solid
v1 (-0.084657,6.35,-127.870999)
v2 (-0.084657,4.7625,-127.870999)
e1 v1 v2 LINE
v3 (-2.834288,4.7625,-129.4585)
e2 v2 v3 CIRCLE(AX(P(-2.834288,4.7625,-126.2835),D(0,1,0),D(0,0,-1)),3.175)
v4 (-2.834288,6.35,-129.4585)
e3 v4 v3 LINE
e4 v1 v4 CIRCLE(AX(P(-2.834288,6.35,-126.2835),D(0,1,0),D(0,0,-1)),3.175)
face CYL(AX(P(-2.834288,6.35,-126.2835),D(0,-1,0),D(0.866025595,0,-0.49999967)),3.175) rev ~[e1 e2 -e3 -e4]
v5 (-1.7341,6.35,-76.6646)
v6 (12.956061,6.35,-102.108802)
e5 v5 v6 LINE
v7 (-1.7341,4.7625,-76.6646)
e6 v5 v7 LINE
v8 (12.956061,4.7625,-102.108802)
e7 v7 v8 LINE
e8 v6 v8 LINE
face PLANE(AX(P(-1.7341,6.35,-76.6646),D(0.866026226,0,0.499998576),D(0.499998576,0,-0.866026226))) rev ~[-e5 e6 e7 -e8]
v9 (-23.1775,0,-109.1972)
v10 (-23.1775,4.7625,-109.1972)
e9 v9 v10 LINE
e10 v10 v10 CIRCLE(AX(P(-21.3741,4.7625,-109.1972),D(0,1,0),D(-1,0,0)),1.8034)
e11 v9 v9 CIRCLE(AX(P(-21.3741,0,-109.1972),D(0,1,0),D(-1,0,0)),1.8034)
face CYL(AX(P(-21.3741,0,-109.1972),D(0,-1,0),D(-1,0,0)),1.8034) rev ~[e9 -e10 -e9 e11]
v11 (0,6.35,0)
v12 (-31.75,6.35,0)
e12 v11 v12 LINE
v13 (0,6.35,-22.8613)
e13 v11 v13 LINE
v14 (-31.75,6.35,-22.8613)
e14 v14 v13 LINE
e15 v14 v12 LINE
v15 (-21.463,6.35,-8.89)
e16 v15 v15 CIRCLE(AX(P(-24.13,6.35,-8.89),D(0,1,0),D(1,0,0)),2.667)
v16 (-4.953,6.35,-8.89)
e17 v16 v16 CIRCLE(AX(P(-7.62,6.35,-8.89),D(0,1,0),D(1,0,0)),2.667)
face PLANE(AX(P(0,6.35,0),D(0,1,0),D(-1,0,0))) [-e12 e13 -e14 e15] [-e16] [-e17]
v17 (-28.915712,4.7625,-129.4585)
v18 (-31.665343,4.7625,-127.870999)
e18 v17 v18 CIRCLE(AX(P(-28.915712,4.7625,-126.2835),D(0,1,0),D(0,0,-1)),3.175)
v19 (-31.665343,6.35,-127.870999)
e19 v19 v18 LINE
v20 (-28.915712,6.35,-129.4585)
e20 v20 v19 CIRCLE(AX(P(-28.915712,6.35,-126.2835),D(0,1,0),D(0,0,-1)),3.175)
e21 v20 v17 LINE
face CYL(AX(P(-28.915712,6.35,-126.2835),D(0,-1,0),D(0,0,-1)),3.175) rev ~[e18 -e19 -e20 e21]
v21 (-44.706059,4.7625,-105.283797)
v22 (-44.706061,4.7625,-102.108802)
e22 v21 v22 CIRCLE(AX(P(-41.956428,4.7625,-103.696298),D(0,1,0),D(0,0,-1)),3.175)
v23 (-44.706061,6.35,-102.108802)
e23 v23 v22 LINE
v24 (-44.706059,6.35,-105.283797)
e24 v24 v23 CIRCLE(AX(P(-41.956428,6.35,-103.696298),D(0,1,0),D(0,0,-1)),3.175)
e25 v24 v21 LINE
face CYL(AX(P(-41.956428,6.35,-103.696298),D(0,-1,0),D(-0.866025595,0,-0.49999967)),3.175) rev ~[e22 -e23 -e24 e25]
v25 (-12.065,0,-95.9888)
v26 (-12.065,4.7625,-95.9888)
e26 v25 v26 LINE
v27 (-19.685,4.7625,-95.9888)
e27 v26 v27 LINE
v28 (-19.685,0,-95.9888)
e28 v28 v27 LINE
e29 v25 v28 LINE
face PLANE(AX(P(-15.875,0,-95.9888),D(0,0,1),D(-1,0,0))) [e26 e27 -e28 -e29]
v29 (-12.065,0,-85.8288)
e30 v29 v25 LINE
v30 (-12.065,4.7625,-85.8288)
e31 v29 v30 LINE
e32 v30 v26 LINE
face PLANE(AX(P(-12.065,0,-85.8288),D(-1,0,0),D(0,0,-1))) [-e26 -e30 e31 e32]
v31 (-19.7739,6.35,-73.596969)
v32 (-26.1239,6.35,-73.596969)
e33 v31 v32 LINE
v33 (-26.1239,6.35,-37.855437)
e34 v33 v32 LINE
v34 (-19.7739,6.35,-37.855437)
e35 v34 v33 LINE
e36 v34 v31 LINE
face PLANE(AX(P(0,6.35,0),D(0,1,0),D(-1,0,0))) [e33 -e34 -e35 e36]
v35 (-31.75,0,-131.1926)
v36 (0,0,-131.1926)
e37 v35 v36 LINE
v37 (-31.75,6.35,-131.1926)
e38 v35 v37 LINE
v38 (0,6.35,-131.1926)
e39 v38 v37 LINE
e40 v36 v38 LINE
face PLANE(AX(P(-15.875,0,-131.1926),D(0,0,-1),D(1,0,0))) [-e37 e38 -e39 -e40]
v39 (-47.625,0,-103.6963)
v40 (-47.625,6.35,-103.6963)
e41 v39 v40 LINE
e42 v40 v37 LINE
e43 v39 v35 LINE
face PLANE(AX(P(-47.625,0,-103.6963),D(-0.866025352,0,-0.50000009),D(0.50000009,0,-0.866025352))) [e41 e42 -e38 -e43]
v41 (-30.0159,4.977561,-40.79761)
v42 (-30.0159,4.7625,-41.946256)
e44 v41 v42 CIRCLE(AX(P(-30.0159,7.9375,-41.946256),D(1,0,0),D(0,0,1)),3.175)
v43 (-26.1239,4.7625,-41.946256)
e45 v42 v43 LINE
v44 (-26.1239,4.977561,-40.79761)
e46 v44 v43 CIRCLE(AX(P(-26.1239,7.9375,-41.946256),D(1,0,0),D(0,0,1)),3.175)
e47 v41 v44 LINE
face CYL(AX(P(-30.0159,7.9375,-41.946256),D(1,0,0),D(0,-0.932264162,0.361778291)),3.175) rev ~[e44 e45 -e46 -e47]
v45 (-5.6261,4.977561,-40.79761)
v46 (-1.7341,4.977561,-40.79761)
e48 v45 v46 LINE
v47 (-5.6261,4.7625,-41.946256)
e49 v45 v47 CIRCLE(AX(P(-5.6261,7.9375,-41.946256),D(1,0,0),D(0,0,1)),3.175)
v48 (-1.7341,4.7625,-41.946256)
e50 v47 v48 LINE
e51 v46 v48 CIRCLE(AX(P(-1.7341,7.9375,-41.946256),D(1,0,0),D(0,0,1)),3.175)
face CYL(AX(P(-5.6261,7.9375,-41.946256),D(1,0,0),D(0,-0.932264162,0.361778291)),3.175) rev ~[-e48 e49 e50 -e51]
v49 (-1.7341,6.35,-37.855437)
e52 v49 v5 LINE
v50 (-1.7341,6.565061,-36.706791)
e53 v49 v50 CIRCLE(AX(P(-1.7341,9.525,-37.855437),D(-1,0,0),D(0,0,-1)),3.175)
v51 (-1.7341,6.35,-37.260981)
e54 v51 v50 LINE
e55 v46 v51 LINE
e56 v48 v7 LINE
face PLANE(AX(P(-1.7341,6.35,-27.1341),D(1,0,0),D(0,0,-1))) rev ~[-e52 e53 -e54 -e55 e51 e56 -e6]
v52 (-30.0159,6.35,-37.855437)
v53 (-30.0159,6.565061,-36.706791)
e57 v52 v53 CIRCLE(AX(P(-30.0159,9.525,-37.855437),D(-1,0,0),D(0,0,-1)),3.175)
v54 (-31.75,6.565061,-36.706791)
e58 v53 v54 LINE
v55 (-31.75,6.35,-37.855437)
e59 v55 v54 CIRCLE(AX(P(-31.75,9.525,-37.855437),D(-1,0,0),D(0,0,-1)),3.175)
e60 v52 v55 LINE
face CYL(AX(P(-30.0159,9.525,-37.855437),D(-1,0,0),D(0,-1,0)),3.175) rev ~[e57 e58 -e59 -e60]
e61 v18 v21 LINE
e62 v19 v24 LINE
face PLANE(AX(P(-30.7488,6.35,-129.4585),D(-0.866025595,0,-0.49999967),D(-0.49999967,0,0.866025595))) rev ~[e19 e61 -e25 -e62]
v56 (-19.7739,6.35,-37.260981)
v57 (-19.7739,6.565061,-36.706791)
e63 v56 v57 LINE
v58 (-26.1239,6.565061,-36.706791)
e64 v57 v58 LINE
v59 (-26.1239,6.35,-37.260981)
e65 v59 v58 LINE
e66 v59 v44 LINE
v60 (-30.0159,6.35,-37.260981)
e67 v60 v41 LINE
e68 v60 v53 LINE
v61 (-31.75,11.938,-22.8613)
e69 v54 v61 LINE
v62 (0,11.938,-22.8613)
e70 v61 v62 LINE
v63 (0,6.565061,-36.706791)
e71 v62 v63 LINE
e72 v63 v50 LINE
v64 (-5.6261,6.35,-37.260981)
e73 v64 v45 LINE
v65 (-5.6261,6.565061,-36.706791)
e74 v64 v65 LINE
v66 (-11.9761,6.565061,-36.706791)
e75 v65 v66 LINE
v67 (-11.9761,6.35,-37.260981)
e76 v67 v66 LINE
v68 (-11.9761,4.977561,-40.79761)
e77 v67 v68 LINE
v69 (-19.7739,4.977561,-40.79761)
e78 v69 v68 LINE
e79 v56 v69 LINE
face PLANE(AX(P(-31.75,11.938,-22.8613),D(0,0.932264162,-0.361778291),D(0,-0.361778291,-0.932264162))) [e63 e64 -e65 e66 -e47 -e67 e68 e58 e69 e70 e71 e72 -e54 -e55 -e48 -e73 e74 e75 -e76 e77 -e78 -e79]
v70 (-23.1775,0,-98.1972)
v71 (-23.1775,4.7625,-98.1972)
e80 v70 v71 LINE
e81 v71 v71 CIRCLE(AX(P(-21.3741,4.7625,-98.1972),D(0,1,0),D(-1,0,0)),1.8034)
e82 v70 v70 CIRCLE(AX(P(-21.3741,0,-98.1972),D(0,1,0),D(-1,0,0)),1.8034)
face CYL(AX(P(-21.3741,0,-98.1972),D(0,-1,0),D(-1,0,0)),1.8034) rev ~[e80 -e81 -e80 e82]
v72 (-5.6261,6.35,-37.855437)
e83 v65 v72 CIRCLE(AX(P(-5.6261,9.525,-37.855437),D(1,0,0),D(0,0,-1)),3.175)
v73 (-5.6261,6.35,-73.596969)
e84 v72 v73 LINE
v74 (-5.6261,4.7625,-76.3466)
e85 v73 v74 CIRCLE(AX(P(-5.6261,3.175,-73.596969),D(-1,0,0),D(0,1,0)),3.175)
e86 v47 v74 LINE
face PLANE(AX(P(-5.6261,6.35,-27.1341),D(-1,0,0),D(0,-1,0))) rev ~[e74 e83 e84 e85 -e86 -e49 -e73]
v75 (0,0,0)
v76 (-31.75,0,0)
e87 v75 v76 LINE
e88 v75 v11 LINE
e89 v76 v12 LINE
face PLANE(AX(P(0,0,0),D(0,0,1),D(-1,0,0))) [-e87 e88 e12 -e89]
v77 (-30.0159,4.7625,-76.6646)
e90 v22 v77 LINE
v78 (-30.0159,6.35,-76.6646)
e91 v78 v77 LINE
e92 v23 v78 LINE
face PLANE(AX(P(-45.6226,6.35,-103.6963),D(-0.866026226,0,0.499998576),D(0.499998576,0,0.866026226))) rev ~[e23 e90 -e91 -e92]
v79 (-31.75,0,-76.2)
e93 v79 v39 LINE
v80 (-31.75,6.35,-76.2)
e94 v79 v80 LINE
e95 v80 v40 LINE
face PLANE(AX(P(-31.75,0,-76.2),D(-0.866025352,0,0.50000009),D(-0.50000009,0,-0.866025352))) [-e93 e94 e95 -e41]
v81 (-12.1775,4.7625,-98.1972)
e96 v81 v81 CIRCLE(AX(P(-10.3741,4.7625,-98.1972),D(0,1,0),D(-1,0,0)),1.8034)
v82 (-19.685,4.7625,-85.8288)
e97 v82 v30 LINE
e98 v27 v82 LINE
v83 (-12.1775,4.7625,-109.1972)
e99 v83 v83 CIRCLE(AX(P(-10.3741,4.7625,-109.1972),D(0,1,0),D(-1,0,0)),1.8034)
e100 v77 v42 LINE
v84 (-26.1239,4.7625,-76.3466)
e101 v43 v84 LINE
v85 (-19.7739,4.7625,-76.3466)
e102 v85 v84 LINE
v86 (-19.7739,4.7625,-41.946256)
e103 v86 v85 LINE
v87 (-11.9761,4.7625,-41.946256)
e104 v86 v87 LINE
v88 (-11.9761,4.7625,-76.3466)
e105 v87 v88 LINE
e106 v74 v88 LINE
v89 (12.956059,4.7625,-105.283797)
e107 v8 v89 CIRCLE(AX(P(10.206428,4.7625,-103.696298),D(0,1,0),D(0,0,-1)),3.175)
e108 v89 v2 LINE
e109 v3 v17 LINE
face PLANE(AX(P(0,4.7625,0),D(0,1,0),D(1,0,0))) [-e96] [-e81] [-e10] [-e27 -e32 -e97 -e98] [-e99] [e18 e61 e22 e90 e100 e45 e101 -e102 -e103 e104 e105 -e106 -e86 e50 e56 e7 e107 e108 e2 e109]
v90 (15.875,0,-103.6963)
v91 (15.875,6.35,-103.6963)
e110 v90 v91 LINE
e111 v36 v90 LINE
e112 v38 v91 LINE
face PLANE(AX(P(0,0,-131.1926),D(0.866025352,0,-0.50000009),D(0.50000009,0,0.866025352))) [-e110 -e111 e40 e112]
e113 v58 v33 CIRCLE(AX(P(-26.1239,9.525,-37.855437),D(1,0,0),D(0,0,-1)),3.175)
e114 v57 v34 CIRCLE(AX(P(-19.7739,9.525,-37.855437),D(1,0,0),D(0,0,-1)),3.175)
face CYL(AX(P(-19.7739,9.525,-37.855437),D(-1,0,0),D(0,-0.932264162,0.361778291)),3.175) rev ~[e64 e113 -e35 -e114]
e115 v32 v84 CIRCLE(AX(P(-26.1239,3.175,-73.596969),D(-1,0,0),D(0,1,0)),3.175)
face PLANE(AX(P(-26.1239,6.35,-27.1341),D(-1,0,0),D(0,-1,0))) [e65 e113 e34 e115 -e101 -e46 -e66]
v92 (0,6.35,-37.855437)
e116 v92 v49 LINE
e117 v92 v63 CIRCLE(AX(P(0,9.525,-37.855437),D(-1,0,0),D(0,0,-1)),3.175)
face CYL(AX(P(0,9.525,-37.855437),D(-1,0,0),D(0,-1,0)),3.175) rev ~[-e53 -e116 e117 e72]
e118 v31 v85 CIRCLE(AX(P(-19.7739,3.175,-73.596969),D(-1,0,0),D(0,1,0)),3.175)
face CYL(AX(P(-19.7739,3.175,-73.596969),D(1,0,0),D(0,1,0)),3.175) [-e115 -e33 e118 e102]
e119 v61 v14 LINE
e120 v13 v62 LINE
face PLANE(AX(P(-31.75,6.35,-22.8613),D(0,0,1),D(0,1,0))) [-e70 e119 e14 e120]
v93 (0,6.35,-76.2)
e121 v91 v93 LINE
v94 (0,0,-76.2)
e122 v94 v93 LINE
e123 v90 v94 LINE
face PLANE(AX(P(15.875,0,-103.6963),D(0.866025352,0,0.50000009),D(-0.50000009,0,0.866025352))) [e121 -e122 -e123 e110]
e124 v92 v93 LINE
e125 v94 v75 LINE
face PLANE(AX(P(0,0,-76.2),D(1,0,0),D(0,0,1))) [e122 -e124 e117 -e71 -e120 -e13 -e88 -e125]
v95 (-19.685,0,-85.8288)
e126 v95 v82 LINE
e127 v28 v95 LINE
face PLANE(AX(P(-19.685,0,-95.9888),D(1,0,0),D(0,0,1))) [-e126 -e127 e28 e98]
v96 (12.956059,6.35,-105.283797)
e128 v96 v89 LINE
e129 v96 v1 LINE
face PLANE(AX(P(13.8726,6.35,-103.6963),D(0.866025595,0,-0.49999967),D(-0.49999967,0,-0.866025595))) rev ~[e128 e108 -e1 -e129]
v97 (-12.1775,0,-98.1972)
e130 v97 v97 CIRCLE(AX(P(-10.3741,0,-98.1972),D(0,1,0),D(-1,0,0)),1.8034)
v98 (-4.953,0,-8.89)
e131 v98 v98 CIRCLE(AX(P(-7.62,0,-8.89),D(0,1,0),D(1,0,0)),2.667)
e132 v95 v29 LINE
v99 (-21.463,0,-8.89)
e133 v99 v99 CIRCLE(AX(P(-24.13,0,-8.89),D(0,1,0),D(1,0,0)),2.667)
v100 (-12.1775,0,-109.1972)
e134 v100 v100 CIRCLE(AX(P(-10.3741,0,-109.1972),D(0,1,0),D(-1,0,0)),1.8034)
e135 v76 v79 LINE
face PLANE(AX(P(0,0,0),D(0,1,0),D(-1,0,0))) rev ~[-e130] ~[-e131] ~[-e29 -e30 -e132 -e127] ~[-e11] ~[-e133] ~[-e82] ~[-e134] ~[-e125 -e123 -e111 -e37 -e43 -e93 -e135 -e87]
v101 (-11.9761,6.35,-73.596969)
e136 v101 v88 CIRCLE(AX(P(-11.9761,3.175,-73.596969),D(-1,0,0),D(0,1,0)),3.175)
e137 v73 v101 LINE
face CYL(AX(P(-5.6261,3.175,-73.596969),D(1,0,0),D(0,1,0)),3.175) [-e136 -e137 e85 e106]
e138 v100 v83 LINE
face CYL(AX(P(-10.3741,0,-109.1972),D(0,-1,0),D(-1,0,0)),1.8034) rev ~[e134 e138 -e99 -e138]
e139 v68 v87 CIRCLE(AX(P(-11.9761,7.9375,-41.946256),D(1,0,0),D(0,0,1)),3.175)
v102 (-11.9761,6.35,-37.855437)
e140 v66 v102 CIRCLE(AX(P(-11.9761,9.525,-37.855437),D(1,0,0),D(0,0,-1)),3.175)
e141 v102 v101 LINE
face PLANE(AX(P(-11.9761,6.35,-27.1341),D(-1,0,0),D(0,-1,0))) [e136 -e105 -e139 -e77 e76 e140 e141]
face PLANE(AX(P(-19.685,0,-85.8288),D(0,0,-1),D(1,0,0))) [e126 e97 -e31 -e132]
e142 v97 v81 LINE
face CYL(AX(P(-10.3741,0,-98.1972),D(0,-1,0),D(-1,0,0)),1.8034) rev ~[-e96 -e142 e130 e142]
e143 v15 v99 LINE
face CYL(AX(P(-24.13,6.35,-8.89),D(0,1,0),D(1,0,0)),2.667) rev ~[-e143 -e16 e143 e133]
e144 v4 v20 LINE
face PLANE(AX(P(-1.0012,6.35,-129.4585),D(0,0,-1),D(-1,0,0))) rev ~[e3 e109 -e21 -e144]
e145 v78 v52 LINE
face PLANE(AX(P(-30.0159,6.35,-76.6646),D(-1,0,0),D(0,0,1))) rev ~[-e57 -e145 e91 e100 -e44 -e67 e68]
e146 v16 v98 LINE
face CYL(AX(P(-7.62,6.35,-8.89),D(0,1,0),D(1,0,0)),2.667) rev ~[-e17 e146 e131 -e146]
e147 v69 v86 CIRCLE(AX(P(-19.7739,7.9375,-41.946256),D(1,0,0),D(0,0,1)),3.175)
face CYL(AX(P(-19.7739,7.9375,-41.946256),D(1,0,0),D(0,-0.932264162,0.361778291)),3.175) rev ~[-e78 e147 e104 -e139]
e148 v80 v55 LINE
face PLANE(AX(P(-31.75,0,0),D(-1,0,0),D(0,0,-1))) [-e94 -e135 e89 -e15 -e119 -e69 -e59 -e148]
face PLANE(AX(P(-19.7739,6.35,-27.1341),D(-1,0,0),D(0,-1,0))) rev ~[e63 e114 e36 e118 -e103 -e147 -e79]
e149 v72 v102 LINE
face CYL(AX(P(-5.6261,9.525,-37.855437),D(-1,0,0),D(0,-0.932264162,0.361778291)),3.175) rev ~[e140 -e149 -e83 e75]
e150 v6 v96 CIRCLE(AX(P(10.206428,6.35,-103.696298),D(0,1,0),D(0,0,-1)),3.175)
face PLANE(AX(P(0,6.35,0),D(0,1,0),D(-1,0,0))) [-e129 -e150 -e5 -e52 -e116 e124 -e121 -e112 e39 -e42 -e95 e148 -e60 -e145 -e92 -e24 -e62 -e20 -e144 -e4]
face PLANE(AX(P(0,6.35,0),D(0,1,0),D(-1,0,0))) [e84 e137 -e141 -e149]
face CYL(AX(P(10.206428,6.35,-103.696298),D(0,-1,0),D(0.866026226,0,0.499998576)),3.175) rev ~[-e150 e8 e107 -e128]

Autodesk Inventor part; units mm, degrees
ref_plane "YZ Plane" through (0, 0, 0) normal (1, 0, 0) x (0, 1, 0)
ref_plane "XZ Plane" through (0, 0, 0) normal (0, 1, 0) x (-1, 0, 0)
ref_plane "XY Plane" through (0, 0, 0) normal (0, 0, 1) x (1, 0, 0)
sketch "Sketch1" plane through (0, 0, 0) normal (0, 1, 0) x (-1, 0, 0)
  line L0 (0, 0) -> (31.75, 0)
  line L1 (31.75, 0) -> (31.75, -76.2)
  line L2 (31.75, -76.2) -> (0, -76.2)
  line L3 (0, -76.2) -> (0, 0)
  line L4 (31.75, -131.1926) -> (0, -131.1926)
  line L5 (0, -131.1926) -> (-15.875, -103.6963)
  line L6 (-15.875, -103.6963) -> (0, -76.2)
  line L7 (0, -76.2) -> (31.75, -76.2)
  line L8 (31.75, -76.2) -> (47.625, -103.6963)
  line L9 (47.625, -103.6963) -> (31.75, -131.1926)
  line L10 (10.3741, -98.1972) -> (21.3741, -98.1972)
  line L11 (21.3741, -98.1972) -> (21.3741, -109.1972)
  line L12 (21.3741, -109.1972) -> (10.3741, -109.1972)
  line L13 (10.3741, -109.1972) -> (10.3741, -98.1972)
  circle A0 centre (21.3741, -98.1972) radius 1.8034
  circle A1 centre (21.3741, -109.1972) radius 1.8034
  circle A2 centre (10.3741, -109.1972) radius 1.8034
  circle A3 centre (10.3741, -98.1972) radius 1.8034
  line L14 (15.875, -131.1926) -> (15.875, -76.2)
  line L15 (47.625, -103.6963) -> (-15.875, -103.6963)
  line L16 (19.685, -85.8288) -> (12.065, -85.8288)
  line L17 (12.065, -85.8288) -> (12.065, -95.9888)
  line L18 (12.065, -95.9888) -> (19.685, -95.9888)
  line L19 (19.685, -95.9888) -> (19.685, -85.8288)
  point P0 (15.875, -103.6963)
  point P1 (15.8741, -98.1972)
  point P2 (31.75, -76.2)
  point P3 (0, -76.2)
  dimension "d0" = 31.75
  dimension "d1" = 76.2
  dimension "d65" = 31.75
  dimension "d66" = 11
  dimension "d67" = 11
  dimension "d68" = 5.4991
  dimension "d69" = 5.4991
  dimension "d70" = 3.6068
  dimension "d71" = 3.6068
  dimension "d72" = 3.6068
  dimension "d73" = 3.6068
  dimension "d94" = 10.16
  dimension "d96" = -1.6909
  dimension "d97" = 7.62
  dimension "d98" = 3.81
extrude "Extrusion1" add sketch "Sketch1" along normal blind 6.35 contours L0 L1 L2 L3 | L2 L14 L16 L17 L18 L10 A3 L13 L15 L6 | L8 L15 L11 A0 L10 L14 L18 L19 L16 L2 | L15 L13 A2 L12 L14 L4 L5 | L9 L4 L14 L12 A1 L11 L15 | L15 L14 L12 A2 L13 | L13 A3 L10 L14 L15 | L15 L14 L10 A0 L11 | L11 A1 L12 L14 L15
sketch "Sketch4" plane through (0, 6.35, 0) normal (0, 1, 0) x (1, 0, 0)
  circle A0 centre (-7.62, 8.89) radius 2.667
  line L0 (-31.75, 0) -> (0, 0) projected
  line L1 (0, 0) -> (0, 76.2) projected
  circle A1 centre (-24.13, 8.89) radius 2.667
  line L2 (-31.75, 76.2) -> (-31.75, 0) projected
  point P0 (0, 127)
  point P1 (-31.75, 127)
  dimension "d11" = 5.334
  dimension "d12" = 8.89
  dimension "d13" = 7.62
  dimension "d14" = 5.334
  dimension "d15" = 8.89
  dimension "d16" = 7.62
extrude "Extrusion4" cut sketch "Sketch4" against normal blind 36.5125
sketch "Sketch8" plane through (0, 6.35, 0) normal (0, 1, 0) x (1, 0, 0)
  circle A0 centre (-10.3741, 98.1972) radius 1.8034 projected
  circle A1 centre (-10.3741, 109.1972) radius 1.8034 projected
  circle A2 centre (-21.3741, 109.1972) radius 1.8034 projected
  circle A3 centre (-21.3741, 98.1972) radius 1.8034 projected
  line L0 (0, 0) -> (0, 76.2) projected
  line L1 (0, 76.2) -> (15.875, 103.6963) projected
  line L2 (15.875, 103.6963) -> (0, 131.1926) projected
  line L3 (0, 131.1926) -> (-31.75, 131.1926) projected
  line L4 (-31.75, 131.1926) -> (-47.625, 103.6963) projected
  line L5 (-47.625, 103.6963) -> (-31.75, 76.2) projected
  line L6 (-31.75, 76.2) -> (-31.75, 0) projected
  line L7 (-30.0159, 27.1341) -> (-1.7341, 27.1341)
  line L8 (-1.7341, 27.1341) -> (-1.7341, 76.6646)
  line L9 (-1.7341, 76.6646) -> (13.8726, 103.6963)
  line L10 (13.8726, 103.6963) -> (-1.0012, 129.4585)
  line L11 (-1.0012, 129.4585) -> (-30.7488, 129.4585)
  line L12 (-30.7488, 129.4585) -> (-45.6226, 103.6963)
  line L13 (-45.6226, 103.6963) -> (-30.0159, 76.6646)
  line L14 (-30.0159, 76.6646) -> (-30.0159, 27.1341)
  line L15 (-31.75, 0) -> (0, 0) projected
extrude "Extrusion7" cut sketch "Sketch8" against normal blind 1.5875 contours L14 L13 L12 L11 L10 L9 L8 L7
sketch "Sketch9" plane through (-1.7341, 6.35, -27.1341) normal (0, 0, -1) x (-1, 0, 0)
  line L0 (0, 0) -> (28.2818, 0) projected
  line L1 (0, 0) -> (0, -1.5875) projected
  line L2 (0, -1.5875) -> (28.2818, -1.5875) projected
  line L3 (28.2818, 0) -> (28.2818, -1.5875) projected
  line L4 (30.0159, 0) -> (-1.7341, 0) projected
  line L5 (14.1409, 0) -> (14.1409, -1.5875)
  line L6 (21.2148, 0) -> (24.3898, 0)
  line L7 (-1.7341, -3.175) -> (30.0159, -3.175) projected
  line L8 (21.2148, 0) -> (18.0398, 0)
  line L9 (18.0398, 0) -> (18.0398, -1.5875)
  line L10 (24.3898, 0) -> (24.3898, -1.5875)
  line L11 (28.2818, 0) -> (0, 0)
  line L12 (-1.7341, 0) -> (30.0159, 0)
  line L13 (7.067, 0) -> (3.892, 0)
  line L14 (7.067, 0) -> (10.242, 0)
  line L15 (10.242, 0) -> (10.242, -1.5875)
  line L16 (3.892, 0) -> (3.892, -1.5875)
  point P0 (-1.7341, -6.35)
  point P1 (14.1409, -0.7937)
  point P2 (3.892, 0)
  point P3 (3.892, -1.5875)
  point P4 (10.242, 0)
  dimension "d79" = 7.0739
  dimension "d80" = 3.175
  dimension "d82" = 3.175
extrude "Extrusion8" add sketch "Sketch9" along normal blind 49.2125 contours L0 L15 L2 L16 | L0 L10 L2 L9
fillet "Fillet2" radius 3.175 2 edges at (-8.8011, 6.35, -76.3466) (-22.9489, 6.35, -76.3466)
fillet "Fillet4" radius 3.175 4 edges at (-45.6226, 5.5562, -103.6963) (13.8726, 5.5562, -103.6963) (-30.7488, 5.5562, -129.4585) (-1.0012, 5.5562, -129.4585)
ref_plane "Work Plane1" through (0, 3.175, 0) normal (0, 1, 0) x (1, 0, 0)
sketch "Sketch11" plane through (0, 3.175, 0) normal (0, 1, 0) x (1, 0, 0)
  line L0 (-0.0667, 22.8993) -> (-31.8167, 22.8612)
  line L1 (0, 25.4) -> (0, 0) projected
  line L2 (-31.75, 25.4) -> (0, 25.4) projected
  line L3 (-31.75, 0) -> (-31.75, 25.4) projected
  line L4 (0, 25.4) -> (-31.75, 25.4)
  line L5 (-31.75, 25.4) -> (-31.75, 22.8613)
  line L6 (-31.75, 22.8613) -> (0, 22.8613)
  line L7 (0, 22.8613) -> (0, 25.4)
extrude "Extrusion9" add sketch "Sketch11" along normal blind 3.175
sketch "Sketch13" plane through (0, 6.35, 0) normal (0, 1, 0) x (1, 0, 0)
  line L0 (-1.1058, 21.2778) -> (-31.081, 21.2778)
  line L1 (-31.081, 21.2778) -> (-31.081, 31.4378)
  line L2 (-31.081, 31.4378) -> (-1.1058, 31.4378)
  line L3 (-1.1058, 31.4378) -> (-1.1058, 21.2778)
  point P0 (0, 0)
  dimension "d99" = 10.16
extrude "Extrusion11" add sketch "Sketch13" against normal blind 3.175
sketch "Sketch14" plane through (-31.75, 0, -76.2) normal (-1, 0, 0) x (0, 0, 1)
  line L0 (44.7622, 6.35) -> (53.3387, 6.35)
  line L1 (0, 6.35) -> (76.2, 6.35) projected
  line L2 (44.7622, 4.7625) -> (-0.1466, 4.7625) projected
  line L3 (44.7622, 6.35) -> (2.603, 6.35) projected
  line L4 (53.3387, 6.35) -> (53.3387, 4.7625)
  line L5 (53.3387, 4.7625) -> (34.8482, 4.7625)
  line L6 (53.3387, 6.35) -> (53.3387, 11.938)
  line L7 (53.3387, 11.938) -> (34.8482, 4.7625)
  point P0 (76.2, 0)
  dimension "d107" = 5.588
extrude "Extrusion12" add sketch "Sketch14" against normal blind 31.75
fillet "Fillet9" radius 3.175 7 edges at (-0.867, 6.35, -37.261) (-8.8011, 6.35, -37.261) (-22.9489, 6.35, -37.261) (-30.883, 6.35, -37.261) (-15.875, 4.7625, -41.3518) (-28.0699, 4.7625, -41.3518) (-3.6801, 4.7625, -41.3518)
properties part number "Arm"
